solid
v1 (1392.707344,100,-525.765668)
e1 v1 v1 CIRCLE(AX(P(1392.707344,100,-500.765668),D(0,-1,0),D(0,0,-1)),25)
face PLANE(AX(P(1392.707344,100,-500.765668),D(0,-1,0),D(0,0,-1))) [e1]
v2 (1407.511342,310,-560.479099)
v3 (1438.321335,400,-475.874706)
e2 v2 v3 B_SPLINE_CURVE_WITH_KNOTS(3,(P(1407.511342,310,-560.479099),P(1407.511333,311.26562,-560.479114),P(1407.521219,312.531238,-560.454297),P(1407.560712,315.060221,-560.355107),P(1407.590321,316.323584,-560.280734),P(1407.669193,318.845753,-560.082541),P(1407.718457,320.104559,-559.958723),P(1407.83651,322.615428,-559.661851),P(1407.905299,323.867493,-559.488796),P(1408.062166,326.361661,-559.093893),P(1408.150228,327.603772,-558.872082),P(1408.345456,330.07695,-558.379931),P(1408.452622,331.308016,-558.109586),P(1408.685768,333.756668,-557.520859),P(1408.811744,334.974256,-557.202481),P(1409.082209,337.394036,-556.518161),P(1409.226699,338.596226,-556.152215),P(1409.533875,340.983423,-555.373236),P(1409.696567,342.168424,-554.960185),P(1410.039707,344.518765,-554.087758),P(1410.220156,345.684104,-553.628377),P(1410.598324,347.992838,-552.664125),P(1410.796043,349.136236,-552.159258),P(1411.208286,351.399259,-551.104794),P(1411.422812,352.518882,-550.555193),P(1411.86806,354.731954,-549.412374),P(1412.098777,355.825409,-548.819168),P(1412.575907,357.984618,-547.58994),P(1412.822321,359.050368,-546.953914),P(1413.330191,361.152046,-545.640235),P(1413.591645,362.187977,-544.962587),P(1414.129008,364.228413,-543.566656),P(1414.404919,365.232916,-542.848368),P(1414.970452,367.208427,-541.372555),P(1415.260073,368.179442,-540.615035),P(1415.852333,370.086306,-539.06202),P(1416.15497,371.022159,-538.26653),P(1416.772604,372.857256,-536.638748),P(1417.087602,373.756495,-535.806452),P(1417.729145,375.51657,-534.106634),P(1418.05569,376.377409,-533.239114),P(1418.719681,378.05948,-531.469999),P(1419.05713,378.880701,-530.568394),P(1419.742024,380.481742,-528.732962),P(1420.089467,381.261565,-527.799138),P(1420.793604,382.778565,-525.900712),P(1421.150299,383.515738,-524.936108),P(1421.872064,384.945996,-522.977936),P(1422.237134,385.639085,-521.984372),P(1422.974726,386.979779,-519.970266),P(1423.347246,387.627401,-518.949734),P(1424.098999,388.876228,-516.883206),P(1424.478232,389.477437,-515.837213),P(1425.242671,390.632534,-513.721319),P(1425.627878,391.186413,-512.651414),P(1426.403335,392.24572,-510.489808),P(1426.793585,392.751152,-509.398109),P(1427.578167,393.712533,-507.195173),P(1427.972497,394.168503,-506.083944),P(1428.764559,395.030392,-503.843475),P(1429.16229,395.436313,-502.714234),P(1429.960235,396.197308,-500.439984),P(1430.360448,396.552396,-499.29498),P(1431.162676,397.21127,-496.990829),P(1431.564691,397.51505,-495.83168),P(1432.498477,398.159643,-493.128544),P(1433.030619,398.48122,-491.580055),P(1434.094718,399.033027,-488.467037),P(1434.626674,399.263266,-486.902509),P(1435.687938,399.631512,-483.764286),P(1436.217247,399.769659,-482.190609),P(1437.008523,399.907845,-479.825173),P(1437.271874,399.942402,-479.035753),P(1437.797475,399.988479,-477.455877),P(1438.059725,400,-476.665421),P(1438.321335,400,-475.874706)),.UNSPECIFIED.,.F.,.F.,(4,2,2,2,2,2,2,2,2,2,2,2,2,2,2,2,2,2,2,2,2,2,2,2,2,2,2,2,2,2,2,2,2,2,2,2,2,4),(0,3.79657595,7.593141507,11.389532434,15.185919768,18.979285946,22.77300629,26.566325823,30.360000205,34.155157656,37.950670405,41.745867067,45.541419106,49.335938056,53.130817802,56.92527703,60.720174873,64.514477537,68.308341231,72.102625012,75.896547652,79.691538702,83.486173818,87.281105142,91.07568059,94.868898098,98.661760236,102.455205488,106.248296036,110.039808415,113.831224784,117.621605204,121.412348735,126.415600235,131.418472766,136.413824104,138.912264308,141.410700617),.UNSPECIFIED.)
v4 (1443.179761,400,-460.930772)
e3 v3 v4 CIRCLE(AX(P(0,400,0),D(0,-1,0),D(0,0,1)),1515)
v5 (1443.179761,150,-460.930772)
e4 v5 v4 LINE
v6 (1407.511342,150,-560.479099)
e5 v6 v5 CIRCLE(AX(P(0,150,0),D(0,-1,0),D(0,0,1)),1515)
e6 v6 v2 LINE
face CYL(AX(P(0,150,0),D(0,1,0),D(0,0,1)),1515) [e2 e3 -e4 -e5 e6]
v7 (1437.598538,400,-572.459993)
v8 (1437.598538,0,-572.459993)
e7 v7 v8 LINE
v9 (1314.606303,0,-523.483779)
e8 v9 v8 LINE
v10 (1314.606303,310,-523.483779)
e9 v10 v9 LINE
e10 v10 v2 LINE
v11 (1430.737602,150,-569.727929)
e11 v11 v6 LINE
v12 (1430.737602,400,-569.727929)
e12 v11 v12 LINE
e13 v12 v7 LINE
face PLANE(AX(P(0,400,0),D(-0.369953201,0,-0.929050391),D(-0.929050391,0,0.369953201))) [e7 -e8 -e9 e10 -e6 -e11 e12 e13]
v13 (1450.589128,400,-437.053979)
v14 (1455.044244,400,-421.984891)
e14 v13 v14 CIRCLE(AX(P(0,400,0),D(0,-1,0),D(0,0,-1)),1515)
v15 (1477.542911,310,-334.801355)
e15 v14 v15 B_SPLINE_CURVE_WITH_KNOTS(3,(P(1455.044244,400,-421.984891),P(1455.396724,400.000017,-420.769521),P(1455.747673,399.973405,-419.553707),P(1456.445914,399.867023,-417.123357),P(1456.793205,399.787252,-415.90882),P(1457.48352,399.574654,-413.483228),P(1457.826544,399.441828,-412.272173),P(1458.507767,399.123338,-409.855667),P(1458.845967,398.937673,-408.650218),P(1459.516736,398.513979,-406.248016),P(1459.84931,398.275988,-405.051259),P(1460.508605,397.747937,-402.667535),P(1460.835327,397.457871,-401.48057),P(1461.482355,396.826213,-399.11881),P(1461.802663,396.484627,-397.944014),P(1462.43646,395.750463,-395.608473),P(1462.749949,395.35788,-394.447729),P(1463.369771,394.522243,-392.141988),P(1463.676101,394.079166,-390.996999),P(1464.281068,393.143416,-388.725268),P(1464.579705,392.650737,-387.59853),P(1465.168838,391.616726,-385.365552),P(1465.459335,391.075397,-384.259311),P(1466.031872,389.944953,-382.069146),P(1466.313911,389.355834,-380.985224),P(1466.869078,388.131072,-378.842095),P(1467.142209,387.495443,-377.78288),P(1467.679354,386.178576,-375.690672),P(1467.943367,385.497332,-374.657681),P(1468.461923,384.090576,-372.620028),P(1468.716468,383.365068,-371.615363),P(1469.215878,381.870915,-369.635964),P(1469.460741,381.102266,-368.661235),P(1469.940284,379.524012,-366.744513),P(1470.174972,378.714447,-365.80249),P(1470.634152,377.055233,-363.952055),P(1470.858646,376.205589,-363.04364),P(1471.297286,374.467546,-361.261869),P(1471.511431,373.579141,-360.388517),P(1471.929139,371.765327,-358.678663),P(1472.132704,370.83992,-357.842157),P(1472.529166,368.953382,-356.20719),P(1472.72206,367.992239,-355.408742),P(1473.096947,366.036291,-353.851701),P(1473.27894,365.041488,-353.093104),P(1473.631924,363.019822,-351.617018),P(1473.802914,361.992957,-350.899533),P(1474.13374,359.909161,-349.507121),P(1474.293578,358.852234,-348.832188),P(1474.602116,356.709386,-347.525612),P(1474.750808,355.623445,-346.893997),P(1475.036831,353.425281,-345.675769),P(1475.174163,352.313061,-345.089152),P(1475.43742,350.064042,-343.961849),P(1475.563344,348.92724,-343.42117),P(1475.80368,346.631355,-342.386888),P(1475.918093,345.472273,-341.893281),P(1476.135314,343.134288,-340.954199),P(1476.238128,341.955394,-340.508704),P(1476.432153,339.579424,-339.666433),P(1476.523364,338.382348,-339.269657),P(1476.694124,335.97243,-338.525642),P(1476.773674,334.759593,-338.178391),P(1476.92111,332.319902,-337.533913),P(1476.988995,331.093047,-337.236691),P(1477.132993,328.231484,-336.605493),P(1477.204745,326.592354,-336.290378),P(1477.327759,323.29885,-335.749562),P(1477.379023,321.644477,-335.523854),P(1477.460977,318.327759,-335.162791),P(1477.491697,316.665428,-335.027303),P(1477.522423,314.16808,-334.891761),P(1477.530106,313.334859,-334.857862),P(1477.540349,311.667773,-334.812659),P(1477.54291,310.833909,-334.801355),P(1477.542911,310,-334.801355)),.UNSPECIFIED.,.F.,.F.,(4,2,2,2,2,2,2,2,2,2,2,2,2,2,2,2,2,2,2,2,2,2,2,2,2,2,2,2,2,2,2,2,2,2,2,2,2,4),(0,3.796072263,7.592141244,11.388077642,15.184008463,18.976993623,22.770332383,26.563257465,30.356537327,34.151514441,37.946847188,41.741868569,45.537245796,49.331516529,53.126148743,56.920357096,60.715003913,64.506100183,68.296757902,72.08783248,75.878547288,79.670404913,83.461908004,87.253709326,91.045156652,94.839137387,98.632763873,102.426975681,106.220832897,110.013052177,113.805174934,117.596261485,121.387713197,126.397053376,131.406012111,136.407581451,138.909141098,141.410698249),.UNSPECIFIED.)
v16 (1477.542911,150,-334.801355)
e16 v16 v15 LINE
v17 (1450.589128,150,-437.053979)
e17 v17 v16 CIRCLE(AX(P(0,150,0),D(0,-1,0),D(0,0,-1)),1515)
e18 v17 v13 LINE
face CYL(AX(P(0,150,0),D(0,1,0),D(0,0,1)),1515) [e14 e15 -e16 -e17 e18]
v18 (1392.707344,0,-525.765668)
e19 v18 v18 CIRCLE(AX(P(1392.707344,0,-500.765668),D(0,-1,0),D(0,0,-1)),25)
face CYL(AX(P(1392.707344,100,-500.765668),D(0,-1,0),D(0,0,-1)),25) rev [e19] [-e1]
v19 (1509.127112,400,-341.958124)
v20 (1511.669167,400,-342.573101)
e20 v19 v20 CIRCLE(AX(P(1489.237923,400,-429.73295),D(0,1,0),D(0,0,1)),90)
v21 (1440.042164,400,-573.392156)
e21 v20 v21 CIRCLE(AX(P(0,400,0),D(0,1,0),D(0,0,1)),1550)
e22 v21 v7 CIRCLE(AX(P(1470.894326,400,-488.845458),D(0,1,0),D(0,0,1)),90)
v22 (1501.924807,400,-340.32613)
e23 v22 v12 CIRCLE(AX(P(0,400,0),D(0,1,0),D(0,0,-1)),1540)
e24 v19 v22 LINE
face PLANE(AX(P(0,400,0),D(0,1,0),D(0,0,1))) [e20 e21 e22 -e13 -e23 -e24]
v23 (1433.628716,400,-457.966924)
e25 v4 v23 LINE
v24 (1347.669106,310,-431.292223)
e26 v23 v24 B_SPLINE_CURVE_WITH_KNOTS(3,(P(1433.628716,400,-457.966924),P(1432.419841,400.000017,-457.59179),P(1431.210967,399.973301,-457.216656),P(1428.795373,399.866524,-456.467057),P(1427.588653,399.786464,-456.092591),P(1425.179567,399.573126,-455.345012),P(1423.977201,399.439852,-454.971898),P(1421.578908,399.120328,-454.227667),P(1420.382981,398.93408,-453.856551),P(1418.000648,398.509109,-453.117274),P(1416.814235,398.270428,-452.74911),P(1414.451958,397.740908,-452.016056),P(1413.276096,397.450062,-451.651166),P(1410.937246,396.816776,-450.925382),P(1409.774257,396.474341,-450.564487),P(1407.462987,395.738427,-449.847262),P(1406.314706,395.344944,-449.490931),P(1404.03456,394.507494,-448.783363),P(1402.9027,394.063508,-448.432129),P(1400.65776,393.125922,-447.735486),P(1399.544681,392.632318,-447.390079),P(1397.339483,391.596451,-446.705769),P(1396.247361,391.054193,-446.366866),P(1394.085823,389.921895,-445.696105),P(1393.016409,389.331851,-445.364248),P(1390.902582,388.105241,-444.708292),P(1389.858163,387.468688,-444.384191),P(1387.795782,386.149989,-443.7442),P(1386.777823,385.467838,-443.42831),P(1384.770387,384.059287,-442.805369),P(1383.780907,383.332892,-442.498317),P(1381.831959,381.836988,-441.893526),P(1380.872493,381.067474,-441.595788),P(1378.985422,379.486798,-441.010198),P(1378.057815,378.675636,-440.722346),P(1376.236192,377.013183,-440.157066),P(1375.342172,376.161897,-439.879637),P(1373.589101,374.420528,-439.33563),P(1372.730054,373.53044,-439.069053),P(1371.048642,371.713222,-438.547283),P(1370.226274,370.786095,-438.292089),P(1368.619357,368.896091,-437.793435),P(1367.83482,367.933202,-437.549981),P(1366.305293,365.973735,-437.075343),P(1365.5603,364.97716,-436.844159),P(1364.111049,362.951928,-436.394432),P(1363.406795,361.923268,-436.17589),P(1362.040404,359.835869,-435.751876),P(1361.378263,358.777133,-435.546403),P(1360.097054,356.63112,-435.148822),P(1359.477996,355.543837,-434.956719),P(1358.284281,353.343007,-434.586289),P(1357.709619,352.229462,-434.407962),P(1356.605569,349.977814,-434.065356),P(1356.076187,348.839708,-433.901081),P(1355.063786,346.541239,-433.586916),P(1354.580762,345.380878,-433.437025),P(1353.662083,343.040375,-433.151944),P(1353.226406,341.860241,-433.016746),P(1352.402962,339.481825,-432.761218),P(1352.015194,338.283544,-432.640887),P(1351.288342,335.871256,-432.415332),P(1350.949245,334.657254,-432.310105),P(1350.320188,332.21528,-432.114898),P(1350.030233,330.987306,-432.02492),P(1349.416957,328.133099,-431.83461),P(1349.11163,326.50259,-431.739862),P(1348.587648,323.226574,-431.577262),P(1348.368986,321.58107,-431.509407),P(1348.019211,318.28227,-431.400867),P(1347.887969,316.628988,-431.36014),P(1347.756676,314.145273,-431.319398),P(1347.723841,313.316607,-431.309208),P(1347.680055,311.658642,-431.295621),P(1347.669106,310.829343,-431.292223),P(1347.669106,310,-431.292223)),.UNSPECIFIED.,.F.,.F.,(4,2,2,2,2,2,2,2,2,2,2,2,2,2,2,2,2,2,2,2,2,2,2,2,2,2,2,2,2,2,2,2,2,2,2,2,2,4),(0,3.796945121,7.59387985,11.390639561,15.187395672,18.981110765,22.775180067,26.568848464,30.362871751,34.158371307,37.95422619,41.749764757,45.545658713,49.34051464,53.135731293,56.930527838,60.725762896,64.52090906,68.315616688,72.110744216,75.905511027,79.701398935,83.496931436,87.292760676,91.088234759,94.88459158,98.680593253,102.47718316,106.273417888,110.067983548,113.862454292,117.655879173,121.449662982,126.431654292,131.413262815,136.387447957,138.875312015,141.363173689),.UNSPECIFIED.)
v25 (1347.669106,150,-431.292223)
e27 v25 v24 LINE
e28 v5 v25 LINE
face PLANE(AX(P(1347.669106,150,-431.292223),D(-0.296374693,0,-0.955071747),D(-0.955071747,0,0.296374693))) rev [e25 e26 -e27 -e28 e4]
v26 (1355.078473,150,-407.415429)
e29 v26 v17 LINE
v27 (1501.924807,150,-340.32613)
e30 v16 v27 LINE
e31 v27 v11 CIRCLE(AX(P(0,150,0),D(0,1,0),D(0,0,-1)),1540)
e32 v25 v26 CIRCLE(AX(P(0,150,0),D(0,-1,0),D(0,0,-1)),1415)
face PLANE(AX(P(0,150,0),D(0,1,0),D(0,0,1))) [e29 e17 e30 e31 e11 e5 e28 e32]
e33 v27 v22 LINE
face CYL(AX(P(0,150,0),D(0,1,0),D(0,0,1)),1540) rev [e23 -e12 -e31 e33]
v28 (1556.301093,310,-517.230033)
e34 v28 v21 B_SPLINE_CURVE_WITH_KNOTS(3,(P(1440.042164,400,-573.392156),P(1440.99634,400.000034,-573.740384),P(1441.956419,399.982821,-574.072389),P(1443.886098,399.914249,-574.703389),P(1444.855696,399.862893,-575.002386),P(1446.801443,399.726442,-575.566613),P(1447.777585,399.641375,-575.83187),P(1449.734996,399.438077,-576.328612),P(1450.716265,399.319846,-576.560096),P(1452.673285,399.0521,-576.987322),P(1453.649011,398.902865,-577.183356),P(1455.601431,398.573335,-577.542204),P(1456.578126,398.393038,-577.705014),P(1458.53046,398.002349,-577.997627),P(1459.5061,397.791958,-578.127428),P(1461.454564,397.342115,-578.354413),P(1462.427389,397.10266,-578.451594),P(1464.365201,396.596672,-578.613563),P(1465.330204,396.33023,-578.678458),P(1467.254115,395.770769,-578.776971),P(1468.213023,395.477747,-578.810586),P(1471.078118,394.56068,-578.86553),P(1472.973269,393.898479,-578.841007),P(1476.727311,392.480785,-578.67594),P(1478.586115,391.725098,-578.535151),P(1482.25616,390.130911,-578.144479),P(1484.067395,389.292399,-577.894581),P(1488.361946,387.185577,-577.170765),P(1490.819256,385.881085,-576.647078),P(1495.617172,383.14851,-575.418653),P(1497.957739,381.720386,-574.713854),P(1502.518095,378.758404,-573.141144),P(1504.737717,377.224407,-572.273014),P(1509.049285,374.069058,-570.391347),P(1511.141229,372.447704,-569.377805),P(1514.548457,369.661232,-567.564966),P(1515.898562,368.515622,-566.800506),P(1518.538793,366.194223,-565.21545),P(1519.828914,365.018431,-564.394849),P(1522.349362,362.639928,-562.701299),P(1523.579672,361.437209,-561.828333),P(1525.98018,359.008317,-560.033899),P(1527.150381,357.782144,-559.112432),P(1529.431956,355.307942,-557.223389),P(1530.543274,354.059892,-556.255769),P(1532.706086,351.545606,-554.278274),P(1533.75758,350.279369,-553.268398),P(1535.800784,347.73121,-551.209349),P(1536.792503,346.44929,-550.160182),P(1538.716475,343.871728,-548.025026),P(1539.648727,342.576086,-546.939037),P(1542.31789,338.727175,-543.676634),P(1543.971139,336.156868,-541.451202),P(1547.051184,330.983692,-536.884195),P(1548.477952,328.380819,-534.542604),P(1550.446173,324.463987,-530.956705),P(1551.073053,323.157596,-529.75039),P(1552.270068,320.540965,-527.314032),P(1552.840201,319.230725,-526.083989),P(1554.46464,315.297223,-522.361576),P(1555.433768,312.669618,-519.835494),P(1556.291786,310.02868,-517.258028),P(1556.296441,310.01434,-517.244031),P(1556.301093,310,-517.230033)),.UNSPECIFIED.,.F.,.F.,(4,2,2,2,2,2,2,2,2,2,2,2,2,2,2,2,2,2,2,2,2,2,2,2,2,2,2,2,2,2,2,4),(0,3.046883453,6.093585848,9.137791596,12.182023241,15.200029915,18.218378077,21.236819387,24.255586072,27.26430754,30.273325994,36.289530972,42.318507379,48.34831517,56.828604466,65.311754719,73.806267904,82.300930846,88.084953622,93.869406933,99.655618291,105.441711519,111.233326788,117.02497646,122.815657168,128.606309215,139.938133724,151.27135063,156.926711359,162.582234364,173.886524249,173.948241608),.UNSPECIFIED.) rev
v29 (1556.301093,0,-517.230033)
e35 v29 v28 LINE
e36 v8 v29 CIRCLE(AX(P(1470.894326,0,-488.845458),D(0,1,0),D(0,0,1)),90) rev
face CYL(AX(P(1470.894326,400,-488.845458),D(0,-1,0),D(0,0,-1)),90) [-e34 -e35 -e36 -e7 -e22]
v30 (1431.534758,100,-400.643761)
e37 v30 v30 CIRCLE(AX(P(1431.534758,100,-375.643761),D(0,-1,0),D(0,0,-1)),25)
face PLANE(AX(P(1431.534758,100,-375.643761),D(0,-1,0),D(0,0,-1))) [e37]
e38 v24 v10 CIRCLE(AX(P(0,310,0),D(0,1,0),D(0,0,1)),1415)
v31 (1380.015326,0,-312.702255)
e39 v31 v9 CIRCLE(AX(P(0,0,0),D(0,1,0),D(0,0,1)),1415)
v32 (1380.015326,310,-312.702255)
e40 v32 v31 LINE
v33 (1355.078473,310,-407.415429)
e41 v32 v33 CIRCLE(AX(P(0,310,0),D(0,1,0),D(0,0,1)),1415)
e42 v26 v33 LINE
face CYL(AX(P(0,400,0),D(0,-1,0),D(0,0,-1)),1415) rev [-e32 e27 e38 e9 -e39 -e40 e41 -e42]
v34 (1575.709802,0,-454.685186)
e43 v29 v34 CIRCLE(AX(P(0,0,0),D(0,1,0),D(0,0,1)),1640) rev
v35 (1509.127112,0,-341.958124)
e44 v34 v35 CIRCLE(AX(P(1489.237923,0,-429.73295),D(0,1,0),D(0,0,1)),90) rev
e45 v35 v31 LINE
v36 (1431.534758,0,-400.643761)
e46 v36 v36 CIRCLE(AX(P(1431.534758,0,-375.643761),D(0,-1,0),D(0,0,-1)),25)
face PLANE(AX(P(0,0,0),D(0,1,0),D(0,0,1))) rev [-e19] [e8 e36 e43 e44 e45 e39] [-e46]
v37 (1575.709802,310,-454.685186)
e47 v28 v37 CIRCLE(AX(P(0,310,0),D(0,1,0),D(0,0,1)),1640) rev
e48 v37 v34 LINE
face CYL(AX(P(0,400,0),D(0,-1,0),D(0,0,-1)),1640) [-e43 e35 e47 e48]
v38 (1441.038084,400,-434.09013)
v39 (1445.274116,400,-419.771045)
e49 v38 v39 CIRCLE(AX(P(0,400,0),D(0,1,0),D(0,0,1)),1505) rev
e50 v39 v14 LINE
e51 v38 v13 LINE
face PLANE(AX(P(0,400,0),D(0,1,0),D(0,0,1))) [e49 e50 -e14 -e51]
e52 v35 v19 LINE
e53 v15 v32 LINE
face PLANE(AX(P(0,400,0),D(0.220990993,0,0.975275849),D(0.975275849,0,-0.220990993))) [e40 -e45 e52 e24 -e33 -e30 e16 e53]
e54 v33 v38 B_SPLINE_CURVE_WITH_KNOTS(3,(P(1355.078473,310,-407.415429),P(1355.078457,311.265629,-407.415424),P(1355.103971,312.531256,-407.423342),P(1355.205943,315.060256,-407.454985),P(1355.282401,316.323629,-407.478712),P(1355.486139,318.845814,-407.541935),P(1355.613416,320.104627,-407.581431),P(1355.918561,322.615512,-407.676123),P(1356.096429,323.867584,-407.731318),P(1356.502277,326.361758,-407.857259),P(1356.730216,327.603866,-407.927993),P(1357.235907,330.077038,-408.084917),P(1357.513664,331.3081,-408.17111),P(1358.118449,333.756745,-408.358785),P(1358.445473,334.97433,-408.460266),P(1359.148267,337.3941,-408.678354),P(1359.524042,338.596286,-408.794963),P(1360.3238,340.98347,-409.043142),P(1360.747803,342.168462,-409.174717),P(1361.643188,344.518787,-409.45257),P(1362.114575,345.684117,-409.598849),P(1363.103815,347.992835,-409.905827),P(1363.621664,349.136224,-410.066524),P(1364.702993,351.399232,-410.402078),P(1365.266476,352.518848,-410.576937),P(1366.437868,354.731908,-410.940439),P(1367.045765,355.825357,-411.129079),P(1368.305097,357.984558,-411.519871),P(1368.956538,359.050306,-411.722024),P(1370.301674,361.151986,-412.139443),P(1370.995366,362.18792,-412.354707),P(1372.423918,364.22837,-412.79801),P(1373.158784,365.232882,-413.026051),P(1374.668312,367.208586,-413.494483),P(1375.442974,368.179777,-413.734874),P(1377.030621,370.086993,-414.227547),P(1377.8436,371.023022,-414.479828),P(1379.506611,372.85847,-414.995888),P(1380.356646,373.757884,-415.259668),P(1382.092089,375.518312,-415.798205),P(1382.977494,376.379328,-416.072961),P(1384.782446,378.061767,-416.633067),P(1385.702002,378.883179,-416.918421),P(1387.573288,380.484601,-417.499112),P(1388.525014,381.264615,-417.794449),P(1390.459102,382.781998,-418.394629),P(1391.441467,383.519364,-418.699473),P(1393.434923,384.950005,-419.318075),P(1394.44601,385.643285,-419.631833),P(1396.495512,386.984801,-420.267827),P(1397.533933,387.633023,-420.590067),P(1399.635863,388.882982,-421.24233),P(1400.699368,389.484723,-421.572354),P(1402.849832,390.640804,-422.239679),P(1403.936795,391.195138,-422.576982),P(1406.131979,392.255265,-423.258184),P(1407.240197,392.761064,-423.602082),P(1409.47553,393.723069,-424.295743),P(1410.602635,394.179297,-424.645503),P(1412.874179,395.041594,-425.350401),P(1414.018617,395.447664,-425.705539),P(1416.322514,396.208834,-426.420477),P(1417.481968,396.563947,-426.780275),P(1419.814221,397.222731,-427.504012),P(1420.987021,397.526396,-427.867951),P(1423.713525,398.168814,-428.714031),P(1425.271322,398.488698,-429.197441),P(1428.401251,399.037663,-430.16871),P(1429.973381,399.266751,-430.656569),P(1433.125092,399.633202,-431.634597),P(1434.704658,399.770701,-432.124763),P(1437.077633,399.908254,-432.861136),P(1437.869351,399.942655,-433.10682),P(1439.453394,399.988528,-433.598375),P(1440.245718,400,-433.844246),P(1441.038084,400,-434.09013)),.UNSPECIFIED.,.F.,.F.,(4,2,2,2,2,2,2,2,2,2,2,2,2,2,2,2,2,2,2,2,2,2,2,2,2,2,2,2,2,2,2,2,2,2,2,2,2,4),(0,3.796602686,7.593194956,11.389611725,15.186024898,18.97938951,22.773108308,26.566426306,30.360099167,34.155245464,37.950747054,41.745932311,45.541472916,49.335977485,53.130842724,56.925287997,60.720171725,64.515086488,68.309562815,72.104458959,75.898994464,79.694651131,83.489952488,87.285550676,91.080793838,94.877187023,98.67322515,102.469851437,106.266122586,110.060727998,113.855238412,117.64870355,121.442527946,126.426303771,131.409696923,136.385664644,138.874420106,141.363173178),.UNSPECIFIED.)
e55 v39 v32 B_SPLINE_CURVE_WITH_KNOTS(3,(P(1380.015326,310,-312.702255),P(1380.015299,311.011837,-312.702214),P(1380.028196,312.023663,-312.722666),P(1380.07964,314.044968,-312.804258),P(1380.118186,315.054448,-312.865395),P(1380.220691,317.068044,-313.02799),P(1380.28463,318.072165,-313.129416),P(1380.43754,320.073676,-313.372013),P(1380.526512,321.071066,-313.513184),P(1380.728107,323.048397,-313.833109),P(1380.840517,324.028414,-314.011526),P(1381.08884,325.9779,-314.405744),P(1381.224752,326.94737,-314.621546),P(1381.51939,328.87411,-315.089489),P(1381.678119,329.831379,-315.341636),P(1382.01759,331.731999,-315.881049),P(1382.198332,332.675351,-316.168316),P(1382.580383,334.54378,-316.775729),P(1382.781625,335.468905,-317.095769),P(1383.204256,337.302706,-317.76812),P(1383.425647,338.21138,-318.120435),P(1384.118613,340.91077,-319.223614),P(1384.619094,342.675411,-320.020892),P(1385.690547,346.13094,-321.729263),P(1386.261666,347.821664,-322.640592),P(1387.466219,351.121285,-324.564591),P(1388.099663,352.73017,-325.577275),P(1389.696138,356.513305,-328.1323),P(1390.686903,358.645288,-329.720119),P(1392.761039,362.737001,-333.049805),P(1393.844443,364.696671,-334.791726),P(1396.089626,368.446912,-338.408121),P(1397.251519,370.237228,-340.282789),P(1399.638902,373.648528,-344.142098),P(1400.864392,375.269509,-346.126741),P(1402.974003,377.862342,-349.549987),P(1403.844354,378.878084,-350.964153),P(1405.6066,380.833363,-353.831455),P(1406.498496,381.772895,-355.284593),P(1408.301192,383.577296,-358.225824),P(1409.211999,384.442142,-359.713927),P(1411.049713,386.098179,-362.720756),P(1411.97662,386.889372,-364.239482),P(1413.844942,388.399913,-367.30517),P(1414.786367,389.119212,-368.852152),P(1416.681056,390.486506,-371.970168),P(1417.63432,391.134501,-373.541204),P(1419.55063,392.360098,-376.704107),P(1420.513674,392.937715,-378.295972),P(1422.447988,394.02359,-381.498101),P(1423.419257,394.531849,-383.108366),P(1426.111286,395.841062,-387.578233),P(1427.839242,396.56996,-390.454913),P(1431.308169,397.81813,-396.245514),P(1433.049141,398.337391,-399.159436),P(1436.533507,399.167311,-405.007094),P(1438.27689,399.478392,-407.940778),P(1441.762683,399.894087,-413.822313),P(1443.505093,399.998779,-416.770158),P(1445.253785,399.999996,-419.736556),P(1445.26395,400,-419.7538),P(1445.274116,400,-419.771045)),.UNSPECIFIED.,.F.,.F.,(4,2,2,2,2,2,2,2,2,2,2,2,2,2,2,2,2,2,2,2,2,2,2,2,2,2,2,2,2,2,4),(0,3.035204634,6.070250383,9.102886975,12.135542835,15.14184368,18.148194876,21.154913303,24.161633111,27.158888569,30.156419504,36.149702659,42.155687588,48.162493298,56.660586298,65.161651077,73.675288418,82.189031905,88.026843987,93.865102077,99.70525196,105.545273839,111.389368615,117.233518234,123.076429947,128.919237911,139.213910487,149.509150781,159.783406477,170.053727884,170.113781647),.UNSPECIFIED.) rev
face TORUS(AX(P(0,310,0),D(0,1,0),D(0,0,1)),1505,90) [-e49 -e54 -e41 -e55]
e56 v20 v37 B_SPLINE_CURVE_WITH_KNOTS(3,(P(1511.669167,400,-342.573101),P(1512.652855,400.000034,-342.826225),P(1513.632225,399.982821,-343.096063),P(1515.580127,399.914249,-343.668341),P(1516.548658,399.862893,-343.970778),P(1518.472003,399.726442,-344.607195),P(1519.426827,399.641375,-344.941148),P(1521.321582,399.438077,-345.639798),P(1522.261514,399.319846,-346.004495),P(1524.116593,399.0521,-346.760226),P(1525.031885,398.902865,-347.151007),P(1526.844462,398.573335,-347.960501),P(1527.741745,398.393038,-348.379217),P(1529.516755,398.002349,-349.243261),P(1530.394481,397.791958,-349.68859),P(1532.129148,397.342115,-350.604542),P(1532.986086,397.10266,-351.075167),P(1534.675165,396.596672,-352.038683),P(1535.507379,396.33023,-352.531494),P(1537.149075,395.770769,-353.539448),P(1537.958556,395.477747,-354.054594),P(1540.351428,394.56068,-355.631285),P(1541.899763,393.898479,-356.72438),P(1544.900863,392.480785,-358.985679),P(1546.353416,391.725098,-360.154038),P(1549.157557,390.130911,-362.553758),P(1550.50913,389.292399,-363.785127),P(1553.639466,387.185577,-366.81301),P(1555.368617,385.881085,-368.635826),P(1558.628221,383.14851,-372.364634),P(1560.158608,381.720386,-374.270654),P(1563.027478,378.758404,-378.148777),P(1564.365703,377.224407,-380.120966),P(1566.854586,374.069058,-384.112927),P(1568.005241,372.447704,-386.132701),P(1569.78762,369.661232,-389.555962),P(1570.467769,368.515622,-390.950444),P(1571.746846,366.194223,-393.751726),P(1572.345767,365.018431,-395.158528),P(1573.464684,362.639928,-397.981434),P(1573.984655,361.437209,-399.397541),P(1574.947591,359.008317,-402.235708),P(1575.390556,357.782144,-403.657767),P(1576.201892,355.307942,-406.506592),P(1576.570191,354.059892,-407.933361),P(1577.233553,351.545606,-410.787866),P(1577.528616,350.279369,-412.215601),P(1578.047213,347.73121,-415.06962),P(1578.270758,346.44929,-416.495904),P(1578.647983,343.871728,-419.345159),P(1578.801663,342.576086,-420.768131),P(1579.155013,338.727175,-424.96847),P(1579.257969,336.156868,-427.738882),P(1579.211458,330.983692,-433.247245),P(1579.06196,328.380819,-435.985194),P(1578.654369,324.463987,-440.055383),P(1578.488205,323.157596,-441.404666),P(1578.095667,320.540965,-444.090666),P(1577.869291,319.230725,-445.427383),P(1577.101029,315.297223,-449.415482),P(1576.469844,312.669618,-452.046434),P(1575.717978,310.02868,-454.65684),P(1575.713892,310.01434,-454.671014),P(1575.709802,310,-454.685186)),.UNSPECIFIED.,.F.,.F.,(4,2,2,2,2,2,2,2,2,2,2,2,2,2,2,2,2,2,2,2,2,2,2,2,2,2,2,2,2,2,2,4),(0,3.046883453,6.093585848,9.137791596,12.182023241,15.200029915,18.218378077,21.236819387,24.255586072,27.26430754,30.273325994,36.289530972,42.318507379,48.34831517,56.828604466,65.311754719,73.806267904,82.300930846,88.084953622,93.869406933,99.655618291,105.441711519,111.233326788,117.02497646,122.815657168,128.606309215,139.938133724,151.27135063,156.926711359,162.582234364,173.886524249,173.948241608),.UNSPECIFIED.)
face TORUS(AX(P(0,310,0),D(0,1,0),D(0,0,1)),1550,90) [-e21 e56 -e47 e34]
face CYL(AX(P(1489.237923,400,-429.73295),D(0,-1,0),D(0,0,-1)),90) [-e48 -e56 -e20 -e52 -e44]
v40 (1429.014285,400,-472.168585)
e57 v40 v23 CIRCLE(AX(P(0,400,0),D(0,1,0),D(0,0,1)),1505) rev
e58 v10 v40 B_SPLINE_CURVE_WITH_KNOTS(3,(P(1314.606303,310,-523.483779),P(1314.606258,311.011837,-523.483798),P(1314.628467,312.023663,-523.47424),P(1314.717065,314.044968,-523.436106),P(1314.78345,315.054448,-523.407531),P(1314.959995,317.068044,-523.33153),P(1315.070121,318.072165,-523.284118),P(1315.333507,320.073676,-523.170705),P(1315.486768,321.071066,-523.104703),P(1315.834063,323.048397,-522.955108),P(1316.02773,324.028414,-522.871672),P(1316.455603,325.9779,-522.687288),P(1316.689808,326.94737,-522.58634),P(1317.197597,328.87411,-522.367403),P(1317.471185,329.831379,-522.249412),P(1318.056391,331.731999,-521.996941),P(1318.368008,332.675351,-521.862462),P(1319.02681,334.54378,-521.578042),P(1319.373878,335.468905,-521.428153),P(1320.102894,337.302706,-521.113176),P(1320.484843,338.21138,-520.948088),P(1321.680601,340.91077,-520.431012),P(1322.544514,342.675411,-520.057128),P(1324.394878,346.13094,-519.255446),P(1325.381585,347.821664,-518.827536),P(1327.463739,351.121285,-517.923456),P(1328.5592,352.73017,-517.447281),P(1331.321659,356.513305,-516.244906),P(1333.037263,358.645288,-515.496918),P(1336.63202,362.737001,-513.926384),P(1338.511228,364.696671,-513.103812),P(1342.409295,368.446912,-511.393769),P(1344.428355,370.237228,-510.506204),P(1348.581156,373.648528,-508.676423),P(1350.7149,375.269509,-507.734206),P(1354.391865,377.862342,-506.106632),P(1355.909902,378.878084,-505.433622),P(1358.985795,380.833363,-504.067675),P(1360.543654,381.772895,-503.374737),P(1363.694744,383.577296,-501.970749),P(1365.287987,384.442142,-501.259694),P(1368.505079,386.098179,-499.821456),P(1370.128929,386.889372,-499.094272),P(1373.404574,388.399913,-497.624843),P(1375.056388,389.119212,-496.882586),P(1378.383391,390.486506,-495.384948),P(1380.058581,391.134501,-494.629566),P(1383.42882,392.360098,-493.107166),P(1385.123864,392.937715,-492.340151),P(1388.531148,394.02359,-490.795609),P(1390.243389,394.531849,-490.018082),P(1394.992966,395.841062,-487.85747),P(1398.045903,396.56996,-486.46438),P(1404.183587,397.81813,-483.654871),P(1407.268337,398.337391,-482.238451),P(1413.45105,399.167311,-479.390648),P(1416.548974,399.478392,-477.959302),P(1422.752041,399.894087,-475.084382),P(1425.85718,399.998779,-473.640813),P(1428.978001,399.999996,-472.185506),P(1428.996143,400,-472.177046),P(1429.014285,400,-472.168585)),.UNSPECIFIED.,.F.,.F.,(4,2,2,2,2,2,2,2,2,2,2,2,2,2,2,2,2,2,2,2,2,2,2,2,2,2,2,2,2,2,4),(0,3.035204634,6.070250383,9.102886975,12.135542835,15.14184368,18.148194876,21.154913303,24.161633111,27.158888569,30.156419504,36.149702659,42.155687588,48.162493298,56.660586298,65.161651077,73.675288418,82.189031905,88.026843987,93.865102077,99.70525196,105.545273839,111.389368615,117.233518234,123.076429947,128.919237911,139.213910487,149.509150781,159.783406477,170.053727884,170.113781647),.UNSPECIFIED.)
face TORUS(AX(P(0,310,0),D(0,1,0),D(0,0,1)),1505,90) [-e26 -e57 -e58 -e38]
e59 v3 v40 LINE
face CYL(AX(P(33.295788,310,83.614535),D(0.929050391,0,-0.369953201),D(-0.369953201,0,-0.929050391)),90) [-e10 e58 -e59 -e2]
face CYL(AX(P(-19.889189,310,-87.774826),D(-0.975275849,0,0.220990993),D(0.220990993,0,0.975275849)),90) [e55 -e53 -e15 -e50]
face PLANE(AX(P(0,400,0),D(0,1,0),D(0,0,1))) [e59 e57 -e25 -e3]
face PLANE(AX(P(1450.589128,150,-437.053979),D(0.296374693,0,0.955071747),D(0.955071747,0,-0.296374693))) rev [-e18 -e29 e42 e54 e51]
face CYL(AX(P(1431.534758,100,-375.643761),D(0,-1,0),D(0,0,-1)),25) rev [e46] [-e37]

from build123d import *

# Parameters (mm, degrees)
EXTRUDE_1_DEPTH     = 400
CUT_EXTRUDE_START   = -250
CUT_EXTRUDE_1_DEPTH = 250
SKETCH_3_R          = 15.665420251
SKETCH_3_R_2        = 18.510518013
CUT_EXTRUDE_2_DEPTH = 50
FILLET_2_R          = 90
FILLET_3_R          = 90
EXTRUDE_START       = 50
SKETCH_4_R          = 18.510518013
SKETCH_4_R_2        = 15.665420251
EXTRUDE_2_DEPTH     = 50
SKETCH_8_R          = 25
CUT_EXTRUDE_3_DEPTH = 100


with BuildPart() as part:
    # 草图1 → 凸台-拉伸1 (new body)
    with BuildSketch(Plane(origin=(0, 0, 0), x_dir=(1, 0, 0), z_dir=(0, 1, 0))):
        with BuildLine():
            ThreePointArc((1355.07847299, 407.415429308), (1351.426521797, 419.370189907), (1347.669105677, 431.292222979))
            ThreePointArc((1347.669105677, 431.292222979), (1331.935587475, 477.674147112), (1314.606303382, 523.483779222))
            Line((1314.606303382, 523.483779222), (1407.51134249, 560.479099308))
            Line((1407.51134249, 560.479099308), (1430.737602267, 569.72792933))
            Line((1430.737602267, 569.72792933), (1523.642641375, 606.723249416))
            ThreePointArc((1523.642641375, 606.723249416), (1566.317664839, 486.054495722), (1599.452391748, 362.425228886))
            Line((1599.452391748, 362.425228886), (1501.924806885, 340.326129564))
            Line((1501.924806885, 340.326129564), (1477.542910669, 334.801354733))
            Line((1477.542910669, 334.801354733), (1380.015325807, 312.702255411))
            ThreePointArc((1380.015325807, 312.702255411), (1368.366605987, 360.27466136), (1355.07847299, 407.415429308))
        make_face()
    extrude(amount=EXTRUDE_1_DEPTH)

    # 草图2 → 切除-拉伸1 (cut)
    with BuildSketch(Plane(origin=(0, 400, 0), x_dir=(1, 0, 0), z_dir=(0, 1, 0)).offset(CUT_EXTRUDE_START)):
        with BuildLine():
            Line((1347.669105677, 431.292222979), (1443.179761176, 460.930772385))
            ThreePointArc((1443.179761176, 460.930772385), (1426.214363088, 511.016233129), (1407.51134249, 560.479099308))
            Line((1407.51134249, 560.479099308), (1430.737602267, 569.72792933))
            ThreePointArc((1430.737602267, 569.72792933), (1470.810490154, 456.417026471), (1501.924806885, 340.326129564))
            Line((1501.924806885, 340.326129564), (1477.542910669, 334.801354733))
            ThreePointArc((1477.542910669, 334.801354733), (1464.958432674, 386.162906732), (1450.589128489, 437.053978714))
            Line((1450.589128489, 437.053978714), (1355.07847299, 407.415429308))
            ThreePointArc((1355.07847299, 407.415429308), (1351.426521797, 419.370189907), (1347.669105677, 431.292222979))
        make_face()
    extrude(amount=CUT_EXTRUDE_1_DEPTH, mode=Mode.SUBTRACT)

    # 草图3 → 切除-拉伸2 (cut)
    with BuildSketch(Plane.XZ):
        with Locations(Location((1537.673756185, -404.548414334, 0), (0, 0, 270))):
            Circle(SKETCH_3_R)
        with Locations(Location((1496.563725778, -537.026083805, 0), (0, 0, 270))):
            Circle(SKETCH_3_R_2)
    extrude(amount=-CUT_EXTRUDE_2_DEPTH, mode=Mode.SUBTRACT)

    # 圆角2
    fillet_2_edges = [part.edges().sort_by_distance(p)[0] for p in [
        (1523.642641375, 200, -606.723249416),
        (1599.452391748, 200, -362.425228886),
        (1566.317664839, 400, -486.054495722),
    ]]
    fillet(fillet_2_edges, radius=FILLET_2_R)

    # 圆角3
    # the kernel refuses this fillet: 90 mm, written as the material it takes off along each edge
    with BuildSketch(Plane(origin=(0, 400, 0), x_dir=(0.9886635459067241, 0, -0.15014790373209708), z_dir=(0.15014790373209708, 0, 0.9886635459067241))) as fillet_3_piece_1_section:
        with BuildLine():
            CenterArc((1415 + FILLET_3_R, -FILLET_3_R), FILLET_3_R, 90, 90)
            Line((1415 + FILLET_3_R, 0), (1415 + FILLET_3_R, FILLET_3_R * 0.02))
            Line((1415 + FILLET_3_R, FILLET_3_R * 0.02), (1415 - FILLET_3_R * 0.02, FILLET_3_R * 0.02))
            Line((1415 - FILLET_3_R * 0.02, FILLET_3_R * 0.02), (1415 - FILLET_3_R * 0.02, -FILLET_3_R))
            Line((1415 - FILLET_3_R * 0.02, -FILLET_3_R), (1415, -FILLET_3_R))
        make_face()
    fillet_3_piece_1 = revolve(axis=Axis((0, 400, 0), (0, 1, 0)), revolution_arc=13.077233198, mode=Mode.PRIVATE)
    fillet_3_piece_1 = split(fillet_3_piece_1, bisect_by=Plane(origin=(1365.899074688, 379.798837266, -436.949286418), z_dir=(-0.2963746925135586, 0, -0.9550717468533417)), keep=Keep.TOP, mode=Mode.PRIVATE)
    add(fillet_3_piece_1, mode=Mode.SUBTRACT)
    with BuildSketch(Plane(origin=(1696.97997661, 400, -384.524328208), x_dir=(0, -1, 0), z_dir=(-0.9752758486265656, 0, 0.22099099322310048))) as fillet_3_piece_2_section:
        with BuildLine():
            CenterArc((FILLET_3_R, -FILLET_3_R), FILLET_3_R, 90, 90)
            Line((0, -FILLET_3_R), (-FILLET_3_R * 0.02, -FILLET_3_R))
            Line((-FILLET_3_R * 0.02, -FILLET_3_R), (-FILLET_3_R * 0.02, FILLET_3_R * 0.02))
            Line((-FILLET_3_R * 0.02, FILLET_3_R * 0.02), (FILLET_3_R, FILLET_3_R * 0.02))
            Line((FILLET_3_R, FILLET_3_R * 0.02), (FILLET_3_R, 0))
        make_face()
    fillet_3_piece_2 = extrude(amount=550, mode=Mode.PRIVATE)
    fillet_3_piece_2 = fillet_3_piece_2 - Plane(origin=(0, 379.627251668, 0), x_dir=(0.9752758486265642, 0, -0.22099099322310606), z_dir=(0, -1, 0)) * Cylinder(1415, 1461, mode=Mode.PRIVATE)
    fillet_3_piece_2 = fillet_3_piece_2 & Plane(origin=(0, 379.627251668, 0), x_dir=(0.9752758486265641, 0, -0.22099099322310678), z_dir=(0, -1, 0)) * Cylinder(1515, 1461, mode=Mode.PRIVATE)
    add(fillet_3_piece_2, mode=Mode.SUBTRACT)
    with BuildSketch(Plane(origin=(1105.569965388, 400, -440.244309028), x_dir=(0, -1, 0), z_dir=(0.9290503910825915, 0, -0.36995320086368216))) as fillet_3_piece_3_section:
        with BuildLine():
            CenterArc((FILLET_3_R, -FILLET_3_R), FILLET_3_R, 90, 90)
            Line((0, -FILLET_3_R), (-FILLET_3_R * 0.02, -FILLET_3_R))
            Line((-FILLET_3_R * 0.02, -FILLET_3_R), (-FILLET_3_R * 0.02, FILLET_3_R * 0.02))
            Line((-FILLET_3_R * 0.02, FILLET_3_R * 0.02), (FILLET_3_R, FILLET_3_R * 0.02))
            Line((FILLET_3_R, FILLET_3_R * 0.02), (FILLET_3_R, 0))
        make_face()
    fillet_3_piece_3 = extrude(amount=550, mode=Mode.PRIVATE)
    fillet_3_piece_3 = fillet_3_piece_3 - Plane(origin=(0, 379.627145312, 0), x_dir=(0.9752758486265642, 0, -0.22099099322310606), z_dir=(0, -1, 0)) * Cylinder(1415, 1461, mode=Mode.PRIVATE)
    fillet_3_piece_3 = fillet_3_piece_3 & Plane(origin=(0, 379.627145312, 0), x_dir=(0.9525939017664254, 0, -0.30424473424764115), z_dir=(0, -1, 0)) * Cylinder(1515, 1461, mode=Mode.PRIVATE)
    add(fillet_3_piece_3, mode=Mode.SUBTRACT)
    with BuildSketch(Plane(origin=(0, 400, 0), x_dir=(0.9752758486265642, 0, -0.22099099322310606), z_dir=(0.22099099322310606, 0, 0.9752758486265642))) as fillet_3_piece_4_section:
        with BuildLine():
            CenterArc((1415 + FILLET_3_R, -FILLET_3_R), FILLET_3_R, 90, 90)
            Line((1415 + FILLET_3_R, 0), (1415 + FILLET_3_R, FILLET_3_R * 0.02))
            Line((1415 + FILLET_3_R, FILLET_3_R * 0.02), (1415 - FILLET_3_R * 0.02, FILLET_3_R * 0.02))
            Line((1415 - FILLET_3_R * 0.02, FILLET_3_R * 0.02), (1415 - FILLET_3_R * 0.02, -FILLET_3_R))
            Line((1415 - FILLET_3_R * 0.02, -FILLET_3_R), (1415, -FILLET_3_R))
        make_face()
    fillet_3_piece_4 = revolve(axis=Axis((0, 400, 0), (0, 1, 0)), revolution_arc=13.077233198, mode=Mode.PRIVATE)
    fillet_3_piece_4 = split(fillet_3_piece_4, bisect_by=Plane(origin=(1373.308440607, 379.798836933, -413.072492314), z_dir=(0.29637469251355963, 0, 0.9550717468533415)), keep=Keep.TOP, mode=Mode.PRIVATE)
    add(fillet_3_piece_4, mode=Mode.SUBTRACT)
    with BuildSketch(Plane(origin=(0, 400, 0), x_dir=(0.9886635459067241, 0, -0.15014790373209708), z_dir=(0.15014790373209708, 0, 0.9886635459067241))) as fillet_3_piece_5a_section:
        with BuildLine():
            CenterArc((1415 + FILLET_3_R, -FILLET_3_R), FILLET_3_R, 90, 90)
            Line((1415 + FILLET_3_R, 0), (1415 + FILLET_3_R, FILLET_3_R * 0.02))
            Line((1415 + FILLET_3_R, FILLET_3_R * 0.02), (1415 - FILLET_3_R * 0.02, FILLET_3_R * 0.02))
            Line((1415 - FILLET_3_R * 0.02, FILLET_3_R * 0.02), (1415 - FILLET_3_R * 0.02, -FILLET_3_R))
            Line((1415 - FILLET_3_R * 0.02, -FILLET_3_R), (1415, -FILLET_3_R))
        make_face()
    fillet_3_piece_5a = revolve(axis=Axis((0, 400, 0), (0, 1, 0)), revolution_arc=22.187876624, mode=Mode.PRIVATE)
    fillet_3_piece_5a = split(fillet_3_piece_5a, bisect_by=Plane(origin=(1328.166352614, 379.779381403, -528.883468696), z_dir=(-0.3699532008636821, 0, -0.9290503910825915)), keep=Keep.TOP, mode=Mode.PRIVATE)
    with BuildSketch(Plane(origin=(1105.569965388, 400, -440.244309028), x_dir=(0, -1, 0), z_dir=(0.9290503910825915, 0, -0.36995320086368216))) as fillet_3_piece_5b_section:
        with BuildLine():
            CenterArc((FILLET_3_R, -FILLET_3_R), FILLET_3_R, 90, 90)
            Line((0, -FILLET_3_R), (-FILLET_3_R * 0.02, -FILLET_3_R))
            Line((-FILLET_3_R * 0.02, -FILLET_3_R), (-FILLET_3_R * 0.02, FILLET_3_R * 0.02))
            Line((-FILLET_3_R * 0.02, FILLET_3_R * 0.02), (FILLET_3_R, FILLET_3_R * 0.02))
            Line((FILLET_3_R, FILLET_3_R * 0.02), (FILLET_3_R, 0))
        make_face()
    fillet_3_piece_5b = extrude(amount=550, mode=Mode.PRIVATE)
    fillet_3_piece_5b = fillet_3_piece_5b & Plane(origin=(0, 379.605879508, 0), x_dir=(0.9752758486265642, 0, -0.22099099322310606), z_dir=(0, -1, 0)) * Cylinder(1415, 1461, mode=Mode.PRIVATE)
    fillet_3_piece_5 = fillet_3_piece_5a & fillet_3_piece_5b
    add(fillet_3_piece_5, mode=Mode.SUBTRACT)
    with BuildSketch(Plane(origin=(1696.97997661, 400, -384.524328208), x_dir=(0, -1, 0), z_dir=(-0.9752758486265656, 0, 0.22099099322310048))) as fillet_3_piece_6a_section:
        with BuildLine():
            CenterArc((FILLET_3_R, -FILLET_3_R), FILLET_3_R, 90, 90)
            Line((0, -FILLET_3_R), (-FILLET_3_R * 0.02, -FILLET_3_R))
            Line((-FILLET_3_R * 0.02, -FILLET_3_R), (-FILLET_3_R * 0.02, FILLET_3_R * 0.02))
            Line((-FILLET_3_R * 0.02, FILLET_3_R * 0.02), (FILLET_3_R, FILLET_3_R * 0.02))
            Line((FILLET_3_R, FILLET_3_R * 0.02), (FILLET_3_R, 0))
        make_face()
    fillet_3_piece_6a = extrude(amount=550, mode=Mode.PRIVATE)
    fillet_3_piece_6a = fillet_3_piece_6a & Plane(origin=(0, 379.60590325, 0), x_dir=(0.9752758486265642, 0, -0.22099099322310606), z_dir=(0, -1, 0)) * Cylinder(1415, 1461, mode=Mode.PRIVATE)
    with BuildSketch(Plane(origin=(0, 400, 0), x_dir=(0.9979642112015443, 0, -0.06377643107668678), z_dir=(0.06377643107668678, 0, 0.9979642112015443))) as fillet_3_piece_6b_section:
        with BuildLine():
            CenterArc((1415 + FILLET_3_R, -FILLET_3_R), FILLET_3_R, 90, 90)
            Line((1415 + FILLET_3_R, 0), (1415 + FILLET_3_R, FILLET_3_R * 0.02))
            Line((1415 + FILLET_3_R, FILLET_3_R * 0.02), (1415 - FILLET_3_R * 0.02, FILLET_3_R * 0.02))
            Line((1415 - FILLET_3_R * 0.02, FILLET_3_R * 0.02), (1415 - FILLET_3_R * 0.02, -FILLET_3_R))
            Line((1415 - FILLET_3_R * 0.02, -FILLET_3_R), (1415, -FILLET_3_R))
        make_face()
    fillet_3_piece_6b = revolve(axis=Axis((0, 400, 0), (0, 1, 0)), revolution_arc=22.187876624, mode=Mode.PRIVATE)
    fillet_3_piece_6b = split(fillet_3_piece_6b, bisect_by=Plane(origin=(1394.250064092, 379.779381346, -315.927752029), z_dir=(0.22099099322310004, 0, 0.9752758486265657)), keep=Keep.TOP, mode=Mode.PRIVATE)
    fillet_3_piece_6 = fillet_3_piece_6a & fillet_3_piece_6b
    add(fillet_3_piece_6, mode=Mode.SUBTRACT)

    # 草图4 → 凸台-拉伸2 (add)
    with BuildSketch(Plane.XZ.offset(-50).offset(EXTRUDE_START)):
        with Locations((1496.563725778, -537.026083805)):
            Circle(SKETCH_4_R)
        with Locations((1537.673756185, -404.548414334)):
            Circle(SKETCH_4_R_2)
    extrude(amount=-EXTRUDE_2_DEPTH)

    # 草图8 → 切除-拉伸3 (cut)
    with BuildSketch(Plane.XZ):
        with Locations(Location((1431.534758427, -375.643761315, 0), (0, 0, 270))):
            Circle(SKETCH_8_R)
        with Locations(Location((1392.707343884, -500.765668043, 0), (0, 0, 270))):
            Circle(SKETCH_8_R)
    extrude(amount=-CUT_EXTRUDE_3_DEPTH, mode=Mode.SUBTRACT)


solid = part.part
